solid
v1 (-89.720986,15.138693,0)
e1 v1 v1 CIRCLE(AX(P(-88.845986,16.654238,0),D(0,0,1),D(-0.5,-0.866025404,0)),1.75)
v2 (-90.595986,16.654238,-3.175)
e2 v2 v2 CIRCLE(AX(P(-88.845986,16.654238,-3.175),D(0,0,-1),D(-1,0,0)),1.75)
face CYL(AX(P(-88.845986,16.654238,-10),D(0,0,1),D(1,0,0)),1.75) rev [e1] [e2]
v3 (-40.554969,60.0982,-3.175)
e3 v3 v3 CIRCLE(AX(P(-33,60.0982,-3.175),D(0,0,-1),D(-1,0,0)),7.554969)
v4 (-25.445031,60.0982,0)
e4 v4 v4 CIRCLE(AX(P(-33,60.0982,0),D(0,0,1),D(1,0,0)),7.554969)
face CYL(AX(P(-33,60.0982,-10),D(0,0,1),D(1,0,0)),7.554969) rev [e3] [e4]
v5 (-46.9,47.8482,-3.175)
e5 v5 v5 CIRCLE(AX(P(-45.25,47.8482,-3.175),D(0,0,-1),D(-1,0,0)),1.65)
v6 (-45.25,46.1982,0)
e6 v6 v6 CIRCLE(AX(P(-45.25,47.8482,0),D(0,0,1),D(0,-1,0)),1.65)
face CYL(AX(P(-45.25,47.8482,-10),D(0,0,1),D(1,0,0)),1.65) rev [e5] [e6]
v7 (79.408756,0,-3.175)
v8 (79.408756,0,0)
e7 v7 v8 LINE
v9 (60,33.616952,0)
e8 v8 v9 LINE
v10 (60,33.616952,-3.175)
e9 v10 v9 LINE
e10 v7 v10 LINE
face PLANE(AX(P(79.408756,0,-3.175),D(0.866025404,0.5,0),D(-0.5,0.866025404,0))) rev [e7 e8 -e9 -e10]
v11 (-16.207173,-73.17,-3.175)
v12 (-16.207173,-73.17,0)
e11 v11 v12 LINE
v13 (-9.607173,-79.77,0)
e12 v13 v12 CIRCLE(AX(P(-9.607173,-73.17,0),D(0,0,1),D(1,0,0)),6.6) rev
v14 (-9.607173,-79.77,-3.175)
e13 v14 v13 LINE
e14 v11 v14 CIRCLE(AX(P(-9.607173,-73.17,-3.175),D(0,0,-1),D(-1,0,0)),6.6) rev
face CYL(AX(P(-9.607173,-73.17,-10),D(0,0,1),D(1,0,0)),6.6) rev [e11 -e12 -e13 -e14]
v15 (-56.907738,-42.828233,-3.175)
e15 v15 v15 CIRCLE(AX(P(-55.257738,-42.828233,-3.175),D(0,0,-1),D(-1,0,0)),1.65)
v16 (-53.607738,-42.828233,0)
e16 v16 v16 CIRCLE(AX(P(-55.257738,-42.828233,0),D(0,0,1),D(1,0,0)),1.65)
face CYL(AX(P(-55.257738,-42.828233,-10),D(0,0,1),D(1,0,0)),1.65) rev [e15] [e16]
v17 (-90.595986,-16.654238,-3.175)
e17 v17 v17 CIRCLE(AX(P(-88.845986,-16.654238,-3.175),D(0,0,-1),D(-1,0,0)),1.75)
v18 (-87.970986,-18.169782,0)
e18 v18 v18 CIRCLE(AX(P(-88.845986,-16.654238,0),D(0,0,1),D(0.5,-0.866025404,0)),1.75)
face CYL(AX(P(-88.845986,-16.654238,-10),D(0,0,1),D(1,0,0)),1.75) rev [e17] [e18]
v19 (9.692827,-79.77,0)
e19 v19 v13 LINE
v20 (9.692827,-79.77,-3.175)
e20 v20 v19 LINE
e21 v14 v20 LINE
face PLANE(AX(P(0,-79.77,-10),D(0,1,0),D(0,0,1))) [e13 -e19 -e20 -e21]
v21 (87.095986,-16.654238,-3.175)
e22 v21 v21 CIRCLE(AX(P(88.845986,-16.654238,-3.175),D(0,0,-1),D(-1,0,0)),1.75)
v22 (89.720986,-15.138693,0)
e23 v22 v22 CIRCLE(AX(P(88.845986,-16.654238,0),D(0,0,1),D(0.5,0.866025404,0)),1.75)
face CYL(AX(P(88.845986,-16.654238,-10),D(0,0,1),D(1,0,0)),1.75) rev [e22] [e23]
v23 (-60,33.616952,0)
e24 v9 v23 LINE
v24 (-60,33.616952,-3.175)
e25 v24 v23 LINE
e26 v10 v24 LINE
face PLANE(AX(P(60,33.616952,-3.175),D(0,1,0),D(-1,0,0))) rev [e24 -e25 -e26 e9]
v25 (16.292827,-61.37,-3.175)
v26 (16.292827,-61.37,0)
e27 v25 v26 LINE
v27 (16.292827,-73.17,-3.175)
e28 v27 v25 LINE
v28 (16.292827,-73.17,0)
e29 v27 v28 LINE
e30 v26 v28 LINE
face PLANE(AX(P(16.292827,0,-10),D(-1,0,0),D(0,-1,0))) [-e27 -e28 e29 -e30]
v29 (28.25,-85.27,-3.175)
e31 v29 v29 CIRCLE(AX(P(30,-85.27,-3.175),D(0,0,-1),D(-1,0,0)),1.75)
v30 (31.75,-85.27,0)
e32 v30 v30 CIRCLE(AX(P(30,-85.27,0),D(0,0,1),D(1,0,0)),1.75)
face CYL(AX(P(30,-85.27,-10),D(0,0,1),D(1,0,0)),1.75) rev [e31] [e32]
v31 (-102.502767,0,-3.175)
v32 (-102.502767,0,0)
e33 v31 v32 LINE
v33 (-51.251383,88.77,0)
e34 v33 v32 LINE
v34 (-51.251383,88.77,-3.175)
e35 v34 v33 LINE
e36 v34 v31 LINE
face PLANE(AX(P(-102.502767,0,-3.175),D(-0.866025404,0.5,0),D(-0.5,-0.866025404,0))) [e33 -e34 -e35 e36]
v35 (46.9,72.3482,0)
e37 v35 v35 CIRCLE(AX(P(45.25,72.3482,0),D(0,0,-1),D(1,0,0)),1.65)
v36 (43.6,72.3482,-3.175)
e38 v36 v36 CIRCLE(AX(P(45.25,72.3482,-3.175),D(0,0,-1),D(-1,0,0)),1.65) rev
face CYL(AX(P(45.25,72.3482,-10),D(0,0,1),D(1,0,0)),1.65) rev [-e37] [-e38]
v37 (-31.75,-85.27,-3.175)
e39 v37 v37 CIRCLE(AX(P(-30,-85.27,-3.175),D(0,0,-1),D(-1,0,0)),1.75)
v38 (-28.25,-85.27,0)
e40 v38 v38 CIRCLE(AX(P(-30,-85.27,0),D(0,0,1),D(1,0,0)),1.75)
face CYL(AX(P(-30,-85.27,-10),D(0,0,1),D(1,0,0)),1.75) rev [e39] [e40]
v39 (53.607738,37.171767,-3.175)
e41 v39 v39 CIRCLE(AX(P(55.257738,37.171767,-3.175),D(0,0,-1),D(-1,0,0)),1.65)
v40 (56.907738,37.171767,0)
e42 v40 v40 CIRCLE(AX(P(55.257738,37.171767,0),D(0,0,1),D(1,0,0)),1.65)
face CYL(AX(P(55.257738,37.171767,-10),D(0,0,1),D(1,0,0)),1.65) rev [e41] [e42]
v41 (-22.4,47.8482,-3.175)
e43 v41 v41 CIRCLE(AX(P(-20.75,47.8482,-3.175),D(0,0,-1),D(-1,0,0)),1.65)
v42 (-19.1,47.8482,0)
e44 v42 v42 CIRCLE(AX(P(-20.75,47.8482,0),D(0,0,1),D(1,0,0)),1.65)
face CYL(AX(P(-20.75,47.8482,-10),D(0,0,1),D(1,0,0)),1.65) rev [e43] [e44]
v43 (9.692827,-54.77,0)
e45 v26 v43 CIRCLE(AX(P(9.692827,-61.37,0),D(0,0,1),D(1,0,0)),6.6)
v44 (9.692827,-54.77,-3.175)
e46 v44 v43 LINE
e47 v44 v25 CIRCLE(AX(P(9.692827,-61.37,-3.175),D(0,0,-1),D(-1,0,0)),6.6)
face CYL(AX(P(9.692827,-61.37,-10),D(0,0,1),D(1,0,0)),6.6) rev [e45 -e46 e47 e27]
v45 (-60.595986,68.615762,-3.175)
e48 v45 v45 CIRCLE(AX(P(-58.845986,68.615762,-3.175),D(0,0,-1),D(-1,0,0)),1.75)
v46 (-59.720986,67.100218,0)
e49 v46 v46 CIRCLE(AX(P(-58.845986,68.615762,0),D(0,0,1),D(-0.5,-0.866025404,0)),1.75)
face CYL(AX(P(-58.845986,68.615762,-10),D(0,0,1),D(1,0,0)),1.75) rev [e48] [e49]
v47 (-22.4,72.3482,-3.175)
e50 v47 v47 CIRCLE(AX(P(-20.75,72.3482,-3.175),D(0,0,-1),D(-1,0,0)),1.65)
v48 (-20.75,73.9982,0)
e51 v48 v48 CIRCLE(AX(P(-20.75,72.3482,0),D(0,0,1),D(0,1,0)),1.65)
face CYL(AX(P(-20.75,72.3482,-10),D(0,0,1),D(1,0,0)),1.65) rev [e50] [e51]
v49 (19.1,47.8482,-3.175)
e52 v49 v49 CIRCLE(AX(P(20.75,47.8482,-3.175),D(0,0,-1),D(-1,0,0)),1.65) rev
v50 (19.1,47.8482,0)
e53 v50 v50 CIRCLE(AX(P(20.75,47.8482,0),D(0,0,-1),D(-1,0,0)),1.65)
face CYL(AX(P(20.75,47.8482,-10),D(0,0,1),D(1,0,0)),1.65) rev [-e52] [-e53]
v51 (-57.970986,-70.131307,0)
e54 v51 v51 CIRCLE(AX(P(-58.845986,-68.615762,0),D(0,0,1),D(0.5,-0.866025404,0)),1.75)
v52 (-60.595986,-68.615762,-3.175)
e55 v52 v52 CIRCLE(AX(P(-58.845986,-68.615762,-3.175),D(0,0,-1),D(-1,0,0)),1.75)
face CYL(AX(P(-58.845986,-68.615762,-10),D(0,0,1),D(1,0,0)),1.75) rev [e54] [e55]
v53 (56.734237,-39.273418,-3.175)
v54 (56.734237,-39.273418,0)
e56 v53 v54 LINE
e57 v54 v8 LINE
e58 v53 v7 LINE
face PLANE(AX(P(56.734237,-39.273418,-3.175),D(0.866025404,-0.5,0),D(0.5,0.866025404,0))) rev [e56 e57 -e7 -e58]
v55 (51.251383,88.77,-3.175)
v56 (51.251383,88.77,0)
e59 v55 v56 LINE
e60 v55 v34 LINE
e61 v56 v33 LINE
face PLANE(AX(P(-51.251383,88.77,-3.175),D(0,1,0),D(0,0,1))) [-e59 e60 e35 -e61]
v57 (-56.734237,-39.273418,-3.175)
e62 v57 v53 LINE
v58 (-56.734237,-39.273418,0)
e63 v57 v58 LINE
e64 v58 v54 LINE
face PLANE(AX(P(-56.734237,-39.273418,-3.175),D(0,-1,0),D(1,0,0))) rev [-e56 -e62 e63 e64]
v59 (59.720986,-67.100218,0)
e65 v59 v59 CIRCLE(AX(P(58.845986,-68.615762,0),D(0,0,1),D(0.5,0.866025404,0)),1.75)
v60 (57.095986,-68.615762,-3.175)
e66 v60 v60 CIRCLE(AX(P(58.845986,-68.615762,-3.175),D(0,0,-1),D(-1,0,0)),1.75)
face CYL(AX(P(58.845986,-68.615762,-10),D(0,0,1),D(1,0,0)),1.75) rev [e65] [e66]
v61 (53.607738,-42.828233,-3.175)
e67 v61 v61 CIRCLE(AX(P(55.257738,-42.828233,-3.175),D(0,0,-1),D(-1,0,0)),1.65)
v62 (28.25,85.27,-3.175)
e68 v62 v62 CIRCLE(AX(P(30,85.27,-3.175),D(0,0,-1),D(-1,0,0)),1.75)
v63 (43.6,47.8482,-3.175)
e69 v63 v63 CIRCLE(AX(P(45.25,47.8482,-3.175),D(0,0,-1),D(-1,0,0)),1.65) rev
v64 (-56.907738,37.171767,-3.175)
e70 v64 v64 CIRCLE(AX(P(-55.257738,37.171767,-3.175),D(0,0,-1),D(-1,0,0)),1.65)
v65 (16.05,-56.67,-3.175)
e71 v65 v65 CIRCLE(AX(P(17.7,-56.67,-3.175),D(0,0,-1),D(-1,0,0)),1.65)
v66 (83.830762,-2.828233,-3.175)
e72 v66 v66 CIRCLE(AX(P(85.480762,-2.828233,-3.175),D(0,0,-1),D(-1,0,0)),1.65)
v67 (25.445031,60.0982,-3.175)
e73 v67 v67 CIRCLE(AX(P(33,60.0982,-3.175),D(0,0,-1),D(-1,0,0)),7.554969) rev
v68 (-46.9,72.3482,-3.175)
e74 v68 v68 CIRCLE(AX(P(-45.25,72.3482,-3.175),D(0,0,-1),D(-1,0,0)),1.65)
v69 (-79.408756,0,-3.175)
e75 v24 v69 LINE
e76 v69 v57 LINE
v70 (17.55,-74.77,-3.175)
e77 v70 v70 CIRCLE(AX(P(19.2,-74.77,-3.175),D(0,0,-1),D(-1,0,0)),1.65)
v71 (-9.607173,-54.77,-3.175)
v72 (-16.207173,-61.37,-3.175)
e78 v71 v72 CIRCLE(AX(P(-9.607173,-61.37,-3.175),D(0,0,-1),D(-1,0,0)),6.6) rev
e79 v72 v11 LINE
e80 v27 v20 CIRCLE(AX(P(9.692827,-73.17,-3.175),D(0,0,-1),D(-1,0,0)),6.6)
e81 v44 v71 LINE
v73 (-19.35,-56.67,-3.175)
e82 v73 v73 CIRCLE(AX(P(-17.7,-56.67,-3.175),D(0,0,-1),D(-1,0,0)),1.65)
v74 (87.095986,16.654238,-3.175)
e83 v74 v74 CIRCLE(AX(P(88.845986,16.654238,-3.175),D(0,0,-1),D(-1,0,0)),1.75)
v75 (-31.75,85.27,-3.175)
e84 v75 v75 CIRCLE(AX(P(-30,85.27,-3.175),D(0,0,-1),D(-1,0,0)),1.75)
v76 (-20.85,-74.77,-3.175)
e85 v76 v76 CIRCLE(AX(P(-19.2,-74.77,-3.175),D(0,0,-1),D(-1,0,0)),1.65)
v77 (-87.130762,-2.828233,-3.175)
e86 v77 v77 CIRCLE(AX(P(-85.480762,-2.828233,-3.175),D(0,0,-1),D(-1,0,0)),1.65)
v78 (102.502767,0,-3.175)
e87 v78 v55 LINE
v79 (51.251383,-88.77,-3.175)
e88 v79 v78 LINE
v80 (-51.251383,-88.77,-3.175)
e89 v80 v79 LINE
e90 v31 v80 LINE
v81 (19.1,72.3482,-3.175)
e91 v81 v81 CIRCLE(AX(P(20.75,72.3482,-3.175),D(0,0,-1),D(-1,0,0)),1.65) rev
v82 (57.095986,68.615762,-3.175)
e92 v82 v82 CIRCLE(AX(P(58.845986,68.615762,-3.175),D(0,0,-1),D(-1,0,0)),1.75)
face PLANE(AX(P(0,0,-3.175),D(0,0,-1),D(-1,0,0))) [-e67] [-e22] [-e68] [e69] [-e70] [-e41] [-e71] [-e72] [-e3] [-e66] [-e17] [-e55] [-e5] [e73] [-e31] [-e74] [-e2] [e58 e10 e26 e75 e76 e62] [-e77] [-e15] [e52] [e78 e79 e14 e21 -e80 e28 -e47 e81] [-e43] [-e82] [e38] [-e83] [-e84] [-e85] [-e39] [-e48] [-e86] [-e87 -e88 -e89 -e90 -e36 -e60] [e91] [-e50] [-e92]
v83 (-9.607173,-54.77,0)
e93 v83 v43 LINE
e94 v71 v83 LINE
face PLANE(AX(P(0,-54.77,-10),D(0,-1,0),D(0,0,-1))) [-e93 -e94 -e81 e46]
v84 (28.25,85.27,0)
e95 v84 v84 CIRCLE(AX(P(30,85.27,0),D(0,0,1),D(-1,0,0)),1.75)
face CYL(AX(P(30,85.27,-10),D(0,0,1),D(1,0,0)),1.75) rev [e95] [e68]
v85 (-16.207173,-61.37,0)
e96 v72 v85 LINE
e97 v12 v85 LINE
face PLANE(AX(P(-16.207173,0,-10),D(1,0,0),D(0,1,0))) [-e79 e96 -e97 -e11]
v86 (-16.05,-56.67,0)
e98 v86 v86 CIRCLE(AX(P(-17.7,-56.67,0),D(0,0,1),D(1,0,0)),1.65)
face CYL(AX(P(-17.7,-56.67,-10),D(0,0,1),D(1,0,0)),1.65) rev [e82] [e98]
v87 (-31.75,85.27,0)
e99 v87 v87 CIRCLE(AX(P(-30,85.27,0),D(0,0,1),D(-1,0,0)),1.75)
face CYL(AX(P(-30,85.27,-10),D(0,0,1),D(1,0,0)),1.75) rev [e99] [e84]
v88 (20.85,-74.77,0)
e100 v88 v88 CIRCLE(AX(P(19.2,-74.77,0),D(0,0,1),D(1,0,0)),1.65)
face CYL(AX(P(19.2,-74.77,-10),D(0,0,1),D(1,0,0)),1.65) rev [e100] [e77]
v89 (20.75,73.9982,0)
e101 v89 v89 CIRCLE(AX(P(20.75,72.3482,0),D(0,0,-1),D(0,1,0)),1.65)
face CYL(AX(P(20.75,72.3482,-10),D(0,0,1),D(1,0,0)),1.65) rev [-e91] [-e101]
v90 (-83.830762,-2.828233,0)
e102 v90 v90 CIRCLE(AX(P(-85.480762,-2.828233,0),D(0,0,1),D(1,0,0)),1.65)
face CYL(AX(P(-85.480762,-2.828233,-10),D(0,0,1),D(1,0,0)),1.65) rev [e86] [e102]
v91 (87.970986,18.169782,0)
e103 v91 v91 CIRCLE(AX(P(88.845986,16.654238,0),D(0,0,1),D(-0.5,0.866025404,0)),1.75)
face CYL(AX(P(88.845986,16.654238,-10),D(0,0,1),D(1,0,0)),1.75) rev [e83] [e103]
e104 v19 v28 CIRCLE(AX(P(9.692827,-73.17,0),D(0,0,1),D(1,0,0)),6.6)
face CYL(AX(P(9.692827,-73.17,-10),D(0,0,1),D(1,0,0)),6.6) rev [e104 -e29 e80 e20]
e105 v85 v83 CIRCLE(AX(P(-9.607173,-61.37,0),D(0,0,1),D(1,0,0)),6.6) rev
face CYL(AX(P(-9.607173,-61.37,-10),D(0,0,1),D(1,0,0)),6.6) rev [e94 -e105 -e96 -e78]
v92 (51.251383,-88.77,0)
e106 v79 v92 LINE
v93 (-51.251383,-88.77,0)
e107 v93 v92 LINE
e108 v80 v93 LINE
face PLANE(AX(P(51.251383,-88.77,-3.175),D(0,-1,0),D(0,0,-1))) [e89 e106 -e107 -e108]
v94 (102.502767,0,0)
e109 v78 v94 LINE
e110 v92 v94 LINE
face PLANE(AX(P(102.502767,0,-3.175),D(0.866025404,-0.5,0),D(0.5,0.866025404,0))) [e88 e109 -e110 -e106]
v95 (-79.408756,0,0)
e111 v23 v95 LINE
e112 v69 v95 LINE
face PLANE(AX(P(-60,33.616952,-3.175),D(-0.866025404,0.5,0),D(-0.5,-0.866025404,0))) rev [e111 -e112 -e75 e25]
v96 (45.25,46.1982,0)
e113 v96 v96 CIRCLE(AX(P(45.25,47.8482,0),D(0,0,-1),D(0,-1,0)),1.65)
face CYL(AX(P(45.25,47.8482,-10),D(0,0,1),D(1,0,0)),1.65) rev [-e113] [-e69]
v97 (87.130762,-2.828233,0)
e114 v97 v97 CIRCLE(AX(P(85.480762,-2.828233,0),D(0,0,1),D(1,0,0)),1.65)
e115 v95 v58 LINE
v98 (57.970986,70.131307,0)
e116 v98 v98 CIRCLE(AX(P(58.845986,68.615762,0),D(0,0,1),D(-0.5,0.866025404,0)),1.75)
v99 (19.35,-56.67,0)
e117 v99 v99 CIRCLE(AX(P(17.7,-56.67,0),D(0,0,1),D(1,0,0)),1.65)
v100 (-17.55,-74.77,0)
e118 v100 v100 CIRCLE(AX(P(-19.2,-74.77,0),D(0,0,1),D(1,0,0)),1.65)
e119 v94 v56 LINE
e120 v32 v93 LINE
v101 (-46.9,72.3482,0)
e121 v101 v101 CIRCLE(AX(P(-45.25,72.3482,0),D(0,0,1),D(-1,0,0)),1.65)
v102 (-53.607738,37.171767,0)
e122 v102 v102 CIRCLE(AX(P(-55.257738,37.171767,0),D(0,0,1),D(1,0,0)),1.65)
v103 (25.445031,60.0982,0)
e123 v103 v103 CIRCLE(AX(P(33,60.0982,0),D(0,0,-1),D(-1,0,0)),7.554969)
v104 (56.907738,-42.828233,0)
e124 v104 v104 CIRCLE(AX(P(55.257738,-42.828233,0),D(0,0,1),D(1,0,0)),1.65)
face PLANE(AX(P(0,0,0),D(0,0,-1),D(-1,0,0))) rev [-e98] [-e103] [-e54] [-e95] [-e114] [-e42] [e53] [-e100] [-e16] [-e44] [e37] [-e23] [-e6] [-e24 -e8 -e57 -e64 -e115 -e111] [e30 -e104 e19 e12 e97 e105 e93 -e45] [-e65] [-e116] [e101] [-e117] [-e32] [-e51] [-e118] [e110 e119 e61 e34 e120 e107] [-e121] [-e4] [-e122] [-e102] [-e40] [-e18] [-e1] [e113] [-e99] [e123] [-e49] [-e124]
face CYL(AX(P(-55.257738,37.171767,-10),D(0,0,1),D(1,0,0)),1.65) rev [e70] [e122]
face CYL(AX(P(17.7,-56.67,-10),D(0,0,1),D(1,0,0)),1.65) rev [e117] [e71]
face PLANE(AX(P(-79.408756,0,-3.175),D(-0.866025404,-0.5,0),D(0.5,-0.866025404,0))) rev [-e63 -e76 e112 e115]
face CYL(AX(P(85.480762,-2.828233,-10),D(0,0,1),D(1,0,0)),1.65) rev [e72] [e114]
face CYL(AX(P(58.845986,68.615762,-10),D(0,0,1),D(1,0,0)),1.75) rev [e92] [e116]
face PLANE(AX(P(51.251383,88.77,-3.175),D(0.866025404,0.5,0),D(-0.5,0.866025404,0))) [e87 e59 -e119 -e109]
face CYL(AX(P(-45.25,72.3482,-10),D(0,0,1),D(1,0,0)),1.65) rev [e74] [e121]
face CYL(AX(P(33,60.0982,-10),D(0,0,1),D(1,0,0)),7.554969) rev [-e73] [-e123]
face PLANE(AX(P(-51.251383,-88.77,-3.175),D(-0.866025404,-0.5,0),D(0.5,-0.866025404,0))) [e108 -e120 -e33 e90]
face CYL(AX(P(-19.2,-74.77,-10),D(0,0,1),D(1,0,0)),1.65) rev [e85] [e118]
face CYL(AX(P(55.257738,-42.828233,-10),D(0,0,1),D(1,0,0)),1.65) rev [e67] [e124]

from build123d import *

# Parameters (mm, degrees)
FLANGE_BASE1_DEPTH          = 3.175
ESBO_O6_R                   = 1.65
CORTE_EXTRUS_O1_DEPTH       = 10
ESBO_O7_R                   = 1.75
CORTE_EXTRUS_O2_DEPTH       = 10
ESBO_O8_R                   = 7.554969153
ESBO_O8_R_2                 = 1.65
CORTE_EXTRUS_O3_DEPTH       = 10
PADR_OCIRCULAR1_COUNT       = 4
PADR_OCIRCULAR2_COUNT       = 6
ESPELHAR1_COPY_1_SKETCH_R   = 7.554969153
ESPELHAR1_COPY_1_SKETCH_R_2 = 1.65
ESPELHAR1_COPY_1_DEPTH      = 10
ESPELHAR1_COPY_2_SKETCH_R   = 7.554969153
ESPELHAR1_COPY_2_SKETCH_R_2 = 1.65
ESPELHAR1_COPY_2_DEPTH      = 10
ESPELHAR1_COPY_3_SKETCH_R   = 7.554969153
ESPELHAR1_COPY_3_SKETCH_R_2 = 1.65
ESPELHAR1_COPY_3_DEPTH      = 10
ESBO_O9_R                   = 1.65
CORTE_EXTRUS_O4_DEPTH       = 10


# Sheet-metal steps are written as plain solids
with BuildPart() as part:
    # Esboço1 → Flange-base1 (new body)
    with BuildSketch(Plane.XY):
        Polygon((51.251383396, 88.77), (102.502766792, 0), (51.251383396, -88.77), (-51.251383396, -88.77), (-102.502766792, 0), (-51.251383396, 88.77), align=None)
        Polygon((60, 33.616951546), (-60, 33.616951546), (-79.408756024, 0), (-56.734237399, -39.273418297), (56.734237399, -39.273418297), (79.408756024, 0), align=None, mode=Mode.SUBTRACT)
    extrude(amount=-FLANGE_BASE1_DEPTH)

    # Esboço6 → Corte-extrusão1 (cut)
    with BuildSketch(Plane.XY):
        with BuildLine():
            Line((9.692826752, -79.77), (-9.607173248, -79.77))
            ThreePointArc((-9.607173248, -79.77), (-14.274078004, -77.836904756), (-16.207173248, -73.17))
            Line((-16.207173248, -73.17), (-16.207173248, -61.37))
            ThreePointArc((-16.207173248, -61.37), (-14.274078004, -56.703095244), (-9.607173248, -54.77))
            Line((-9.607173248, -54.77), (9.692826752, -54.77))
            ThreePointArc((9.692826752, -54.77), (14.359731508, -56.703095244), (16.292826752, -61.37))
            Line((16.292826752, -61.37), (16.292826752, -73.17))
            ThreePointArc((16.292826752, -73.17), (14.359731508, -77.836904756), (9.692826752, -79.77))
        make_face()
        with Locations((-17.7, -56.67)):
            Circle(ESBO_O6_R)
        with Locations((17.7, -56.67)):
            Circle(ESBO_O6_R)
        with Locations((19.2, -74.77)):
            Circle(ESBO_O6_R)
        with Locations((-19.2, -74.77)):
            Circle(ESBO_O6_R)
    extrude(amount=-CORTE_EXTRUS_O1_DEPTH, mode=Mode.SUBTRACT)

    # Esboço7 → Corte-extrusão2 (cut)
    with BuildSketch(Plane.XY):
        with Locations((-30, -85.27)):
            Circle(ESBO_O7_R)
        with Locations((30, -85.27)):
            Circle(ESBO_O7_R)
    corte_extrus_o2 = extrude(amount=-CORTE_EXTRUS_O2_DEPTH, mode=Mode.SUBTRACT)

    # Esboço8 → Corte-extrusão3 (cut)
    with BuildSketch(Plane.XY):
        with Locations((-33, 60.0982)):
            Circle(ESBO_O8_R)
        with Locations((-20.75, 47.8482)):
            Circle(ESBO_O8_R_2)
    corte_extrus_o3 = extrude(amount=-CORTE_EXTRUS_O3_DEPTH, mode=Mode.SUBTRACT)

    # PadrãoCircular1: Corte-extrusão3 ×4 about axis
    padr_ocircular1_axis = Axis((-33, 60.0982, 0), (0, 0, 1))
    for i in range(1, PADR_OCIRCULAR1_COUNT):
        add(corte_extrus_o3.rotate(padr_ocircular1_axis, i * 360 / PADR_OCIRCULAR1_COUNT), mode=Mode.SUBTRACT)

    # PadrãoCircular2: Corte-extrusão2 ×6 about axis
    padr_ocircular2_axis = Axis((0, 0, 0), (0, 0, 1))
    for i in range(1, PADR_OCIRCULAR2_COUNT):
        add(corte_extrus_o2.rotate(padr_ocircular2_axis, i * 360 / PADR_OCIRCULAR2_COUNT), mode=Mode.SUBTRACT)

    # Espelhar1: Corte-extrusão3 across plane
    add(corte_extrus_o3.mirror(Plane(origin=(0, 0, 0), x_dir=(0, 0, 1), z_dir=(1, 0, 0))), mode=Mode.SUBTRACT)

    # Espelhar1 copy 1 sketch → Espelhar1 copy 1 (cut)
    with BuildSketch(Plane(origin=(-27.0982, 93.0982, 0), x_dir=(0, 1, 0), z_dir=(0, 0, 1))):
        with Locations((-33, -60.0982)):
            Circle(ESPELHAR1_COPY_1_SKETCH_R)
        with Locations((-20.75, -47.8482)):
            Circle(ESPELHAR1_COPY_1_SKETCH_R_2)
    extrude(amount=-ESPELHAR1_COPY_1_DEPTH, mode=Mode.SUBTRACT)

    # Espelhar1 copy 2 sketch → Espelhar1 copy 2 (cut)
    with BuildSketch(Plane(origin=(66, 120.1964, 0), x_dir=(1, 0, 0), z_dir=(0, 0, 1))):
        with Locations((-33, -60.0982)):
            Circle(ESPELHAR1_COPY_2_SKETCH_R)
        with Locations((-20.75, -47.8482)):
            Circle(ESPELHAR1_COPY_2_SKETCH_R_2)
    extrude(amount=-ESPELHAR1_COPY_2_DEPTH, mode=Mode.SUBTRACT)

    # Espelhar1 copy 3 sketch → Espelhar1 copy 3 (cut)
    with BuildSketch(Plane(origin=(93.0982, 27.0982, 0), x_dir=(0, -1, 0), z_dir=(0, 0, 1))):
        with Locations((-33, -60.0982)):
            Circle(ESPELHAR1_COPY_3_SKETCH_R)
        with Locations((-20.75, -47.8482)):
            Circle(ESPELHAR1_COPY_3_SKETCH_R_2)
    extrude(amount=-ESPELHAR1_COPY_3_DEPTH, mode=Mode.SUBTRACT)

    # Esboço9 → Corte-extrusão4 (cut)
    with BuildSketch(Plane.XY):
        with Locations((-55.257737945, 37.171766625)):
            Circle(ESBO_O9_R)
        with Locations((-85.480762114, -2.828233375)):
            Circle(ESBO_O9_R)
        with Locations((85.480762114, -2.828233375)):
            Circle(ESBO_O9_R)
        with Locations((55.257737945, 37.171766625)):
            Circle(ESBO_O9_R)
        with Locations((55.257737945, -42.828233375)):
            Circle(ESBO_O9_R)
        with Locations((-55.257737945, -42.828233375)):
            Circle(ESBO_O9_R)
    extrude(amount=-CORTE_EXTRUS_O4_DEPTH, mode=Mode.SUBTRACT)


solid = part.part
